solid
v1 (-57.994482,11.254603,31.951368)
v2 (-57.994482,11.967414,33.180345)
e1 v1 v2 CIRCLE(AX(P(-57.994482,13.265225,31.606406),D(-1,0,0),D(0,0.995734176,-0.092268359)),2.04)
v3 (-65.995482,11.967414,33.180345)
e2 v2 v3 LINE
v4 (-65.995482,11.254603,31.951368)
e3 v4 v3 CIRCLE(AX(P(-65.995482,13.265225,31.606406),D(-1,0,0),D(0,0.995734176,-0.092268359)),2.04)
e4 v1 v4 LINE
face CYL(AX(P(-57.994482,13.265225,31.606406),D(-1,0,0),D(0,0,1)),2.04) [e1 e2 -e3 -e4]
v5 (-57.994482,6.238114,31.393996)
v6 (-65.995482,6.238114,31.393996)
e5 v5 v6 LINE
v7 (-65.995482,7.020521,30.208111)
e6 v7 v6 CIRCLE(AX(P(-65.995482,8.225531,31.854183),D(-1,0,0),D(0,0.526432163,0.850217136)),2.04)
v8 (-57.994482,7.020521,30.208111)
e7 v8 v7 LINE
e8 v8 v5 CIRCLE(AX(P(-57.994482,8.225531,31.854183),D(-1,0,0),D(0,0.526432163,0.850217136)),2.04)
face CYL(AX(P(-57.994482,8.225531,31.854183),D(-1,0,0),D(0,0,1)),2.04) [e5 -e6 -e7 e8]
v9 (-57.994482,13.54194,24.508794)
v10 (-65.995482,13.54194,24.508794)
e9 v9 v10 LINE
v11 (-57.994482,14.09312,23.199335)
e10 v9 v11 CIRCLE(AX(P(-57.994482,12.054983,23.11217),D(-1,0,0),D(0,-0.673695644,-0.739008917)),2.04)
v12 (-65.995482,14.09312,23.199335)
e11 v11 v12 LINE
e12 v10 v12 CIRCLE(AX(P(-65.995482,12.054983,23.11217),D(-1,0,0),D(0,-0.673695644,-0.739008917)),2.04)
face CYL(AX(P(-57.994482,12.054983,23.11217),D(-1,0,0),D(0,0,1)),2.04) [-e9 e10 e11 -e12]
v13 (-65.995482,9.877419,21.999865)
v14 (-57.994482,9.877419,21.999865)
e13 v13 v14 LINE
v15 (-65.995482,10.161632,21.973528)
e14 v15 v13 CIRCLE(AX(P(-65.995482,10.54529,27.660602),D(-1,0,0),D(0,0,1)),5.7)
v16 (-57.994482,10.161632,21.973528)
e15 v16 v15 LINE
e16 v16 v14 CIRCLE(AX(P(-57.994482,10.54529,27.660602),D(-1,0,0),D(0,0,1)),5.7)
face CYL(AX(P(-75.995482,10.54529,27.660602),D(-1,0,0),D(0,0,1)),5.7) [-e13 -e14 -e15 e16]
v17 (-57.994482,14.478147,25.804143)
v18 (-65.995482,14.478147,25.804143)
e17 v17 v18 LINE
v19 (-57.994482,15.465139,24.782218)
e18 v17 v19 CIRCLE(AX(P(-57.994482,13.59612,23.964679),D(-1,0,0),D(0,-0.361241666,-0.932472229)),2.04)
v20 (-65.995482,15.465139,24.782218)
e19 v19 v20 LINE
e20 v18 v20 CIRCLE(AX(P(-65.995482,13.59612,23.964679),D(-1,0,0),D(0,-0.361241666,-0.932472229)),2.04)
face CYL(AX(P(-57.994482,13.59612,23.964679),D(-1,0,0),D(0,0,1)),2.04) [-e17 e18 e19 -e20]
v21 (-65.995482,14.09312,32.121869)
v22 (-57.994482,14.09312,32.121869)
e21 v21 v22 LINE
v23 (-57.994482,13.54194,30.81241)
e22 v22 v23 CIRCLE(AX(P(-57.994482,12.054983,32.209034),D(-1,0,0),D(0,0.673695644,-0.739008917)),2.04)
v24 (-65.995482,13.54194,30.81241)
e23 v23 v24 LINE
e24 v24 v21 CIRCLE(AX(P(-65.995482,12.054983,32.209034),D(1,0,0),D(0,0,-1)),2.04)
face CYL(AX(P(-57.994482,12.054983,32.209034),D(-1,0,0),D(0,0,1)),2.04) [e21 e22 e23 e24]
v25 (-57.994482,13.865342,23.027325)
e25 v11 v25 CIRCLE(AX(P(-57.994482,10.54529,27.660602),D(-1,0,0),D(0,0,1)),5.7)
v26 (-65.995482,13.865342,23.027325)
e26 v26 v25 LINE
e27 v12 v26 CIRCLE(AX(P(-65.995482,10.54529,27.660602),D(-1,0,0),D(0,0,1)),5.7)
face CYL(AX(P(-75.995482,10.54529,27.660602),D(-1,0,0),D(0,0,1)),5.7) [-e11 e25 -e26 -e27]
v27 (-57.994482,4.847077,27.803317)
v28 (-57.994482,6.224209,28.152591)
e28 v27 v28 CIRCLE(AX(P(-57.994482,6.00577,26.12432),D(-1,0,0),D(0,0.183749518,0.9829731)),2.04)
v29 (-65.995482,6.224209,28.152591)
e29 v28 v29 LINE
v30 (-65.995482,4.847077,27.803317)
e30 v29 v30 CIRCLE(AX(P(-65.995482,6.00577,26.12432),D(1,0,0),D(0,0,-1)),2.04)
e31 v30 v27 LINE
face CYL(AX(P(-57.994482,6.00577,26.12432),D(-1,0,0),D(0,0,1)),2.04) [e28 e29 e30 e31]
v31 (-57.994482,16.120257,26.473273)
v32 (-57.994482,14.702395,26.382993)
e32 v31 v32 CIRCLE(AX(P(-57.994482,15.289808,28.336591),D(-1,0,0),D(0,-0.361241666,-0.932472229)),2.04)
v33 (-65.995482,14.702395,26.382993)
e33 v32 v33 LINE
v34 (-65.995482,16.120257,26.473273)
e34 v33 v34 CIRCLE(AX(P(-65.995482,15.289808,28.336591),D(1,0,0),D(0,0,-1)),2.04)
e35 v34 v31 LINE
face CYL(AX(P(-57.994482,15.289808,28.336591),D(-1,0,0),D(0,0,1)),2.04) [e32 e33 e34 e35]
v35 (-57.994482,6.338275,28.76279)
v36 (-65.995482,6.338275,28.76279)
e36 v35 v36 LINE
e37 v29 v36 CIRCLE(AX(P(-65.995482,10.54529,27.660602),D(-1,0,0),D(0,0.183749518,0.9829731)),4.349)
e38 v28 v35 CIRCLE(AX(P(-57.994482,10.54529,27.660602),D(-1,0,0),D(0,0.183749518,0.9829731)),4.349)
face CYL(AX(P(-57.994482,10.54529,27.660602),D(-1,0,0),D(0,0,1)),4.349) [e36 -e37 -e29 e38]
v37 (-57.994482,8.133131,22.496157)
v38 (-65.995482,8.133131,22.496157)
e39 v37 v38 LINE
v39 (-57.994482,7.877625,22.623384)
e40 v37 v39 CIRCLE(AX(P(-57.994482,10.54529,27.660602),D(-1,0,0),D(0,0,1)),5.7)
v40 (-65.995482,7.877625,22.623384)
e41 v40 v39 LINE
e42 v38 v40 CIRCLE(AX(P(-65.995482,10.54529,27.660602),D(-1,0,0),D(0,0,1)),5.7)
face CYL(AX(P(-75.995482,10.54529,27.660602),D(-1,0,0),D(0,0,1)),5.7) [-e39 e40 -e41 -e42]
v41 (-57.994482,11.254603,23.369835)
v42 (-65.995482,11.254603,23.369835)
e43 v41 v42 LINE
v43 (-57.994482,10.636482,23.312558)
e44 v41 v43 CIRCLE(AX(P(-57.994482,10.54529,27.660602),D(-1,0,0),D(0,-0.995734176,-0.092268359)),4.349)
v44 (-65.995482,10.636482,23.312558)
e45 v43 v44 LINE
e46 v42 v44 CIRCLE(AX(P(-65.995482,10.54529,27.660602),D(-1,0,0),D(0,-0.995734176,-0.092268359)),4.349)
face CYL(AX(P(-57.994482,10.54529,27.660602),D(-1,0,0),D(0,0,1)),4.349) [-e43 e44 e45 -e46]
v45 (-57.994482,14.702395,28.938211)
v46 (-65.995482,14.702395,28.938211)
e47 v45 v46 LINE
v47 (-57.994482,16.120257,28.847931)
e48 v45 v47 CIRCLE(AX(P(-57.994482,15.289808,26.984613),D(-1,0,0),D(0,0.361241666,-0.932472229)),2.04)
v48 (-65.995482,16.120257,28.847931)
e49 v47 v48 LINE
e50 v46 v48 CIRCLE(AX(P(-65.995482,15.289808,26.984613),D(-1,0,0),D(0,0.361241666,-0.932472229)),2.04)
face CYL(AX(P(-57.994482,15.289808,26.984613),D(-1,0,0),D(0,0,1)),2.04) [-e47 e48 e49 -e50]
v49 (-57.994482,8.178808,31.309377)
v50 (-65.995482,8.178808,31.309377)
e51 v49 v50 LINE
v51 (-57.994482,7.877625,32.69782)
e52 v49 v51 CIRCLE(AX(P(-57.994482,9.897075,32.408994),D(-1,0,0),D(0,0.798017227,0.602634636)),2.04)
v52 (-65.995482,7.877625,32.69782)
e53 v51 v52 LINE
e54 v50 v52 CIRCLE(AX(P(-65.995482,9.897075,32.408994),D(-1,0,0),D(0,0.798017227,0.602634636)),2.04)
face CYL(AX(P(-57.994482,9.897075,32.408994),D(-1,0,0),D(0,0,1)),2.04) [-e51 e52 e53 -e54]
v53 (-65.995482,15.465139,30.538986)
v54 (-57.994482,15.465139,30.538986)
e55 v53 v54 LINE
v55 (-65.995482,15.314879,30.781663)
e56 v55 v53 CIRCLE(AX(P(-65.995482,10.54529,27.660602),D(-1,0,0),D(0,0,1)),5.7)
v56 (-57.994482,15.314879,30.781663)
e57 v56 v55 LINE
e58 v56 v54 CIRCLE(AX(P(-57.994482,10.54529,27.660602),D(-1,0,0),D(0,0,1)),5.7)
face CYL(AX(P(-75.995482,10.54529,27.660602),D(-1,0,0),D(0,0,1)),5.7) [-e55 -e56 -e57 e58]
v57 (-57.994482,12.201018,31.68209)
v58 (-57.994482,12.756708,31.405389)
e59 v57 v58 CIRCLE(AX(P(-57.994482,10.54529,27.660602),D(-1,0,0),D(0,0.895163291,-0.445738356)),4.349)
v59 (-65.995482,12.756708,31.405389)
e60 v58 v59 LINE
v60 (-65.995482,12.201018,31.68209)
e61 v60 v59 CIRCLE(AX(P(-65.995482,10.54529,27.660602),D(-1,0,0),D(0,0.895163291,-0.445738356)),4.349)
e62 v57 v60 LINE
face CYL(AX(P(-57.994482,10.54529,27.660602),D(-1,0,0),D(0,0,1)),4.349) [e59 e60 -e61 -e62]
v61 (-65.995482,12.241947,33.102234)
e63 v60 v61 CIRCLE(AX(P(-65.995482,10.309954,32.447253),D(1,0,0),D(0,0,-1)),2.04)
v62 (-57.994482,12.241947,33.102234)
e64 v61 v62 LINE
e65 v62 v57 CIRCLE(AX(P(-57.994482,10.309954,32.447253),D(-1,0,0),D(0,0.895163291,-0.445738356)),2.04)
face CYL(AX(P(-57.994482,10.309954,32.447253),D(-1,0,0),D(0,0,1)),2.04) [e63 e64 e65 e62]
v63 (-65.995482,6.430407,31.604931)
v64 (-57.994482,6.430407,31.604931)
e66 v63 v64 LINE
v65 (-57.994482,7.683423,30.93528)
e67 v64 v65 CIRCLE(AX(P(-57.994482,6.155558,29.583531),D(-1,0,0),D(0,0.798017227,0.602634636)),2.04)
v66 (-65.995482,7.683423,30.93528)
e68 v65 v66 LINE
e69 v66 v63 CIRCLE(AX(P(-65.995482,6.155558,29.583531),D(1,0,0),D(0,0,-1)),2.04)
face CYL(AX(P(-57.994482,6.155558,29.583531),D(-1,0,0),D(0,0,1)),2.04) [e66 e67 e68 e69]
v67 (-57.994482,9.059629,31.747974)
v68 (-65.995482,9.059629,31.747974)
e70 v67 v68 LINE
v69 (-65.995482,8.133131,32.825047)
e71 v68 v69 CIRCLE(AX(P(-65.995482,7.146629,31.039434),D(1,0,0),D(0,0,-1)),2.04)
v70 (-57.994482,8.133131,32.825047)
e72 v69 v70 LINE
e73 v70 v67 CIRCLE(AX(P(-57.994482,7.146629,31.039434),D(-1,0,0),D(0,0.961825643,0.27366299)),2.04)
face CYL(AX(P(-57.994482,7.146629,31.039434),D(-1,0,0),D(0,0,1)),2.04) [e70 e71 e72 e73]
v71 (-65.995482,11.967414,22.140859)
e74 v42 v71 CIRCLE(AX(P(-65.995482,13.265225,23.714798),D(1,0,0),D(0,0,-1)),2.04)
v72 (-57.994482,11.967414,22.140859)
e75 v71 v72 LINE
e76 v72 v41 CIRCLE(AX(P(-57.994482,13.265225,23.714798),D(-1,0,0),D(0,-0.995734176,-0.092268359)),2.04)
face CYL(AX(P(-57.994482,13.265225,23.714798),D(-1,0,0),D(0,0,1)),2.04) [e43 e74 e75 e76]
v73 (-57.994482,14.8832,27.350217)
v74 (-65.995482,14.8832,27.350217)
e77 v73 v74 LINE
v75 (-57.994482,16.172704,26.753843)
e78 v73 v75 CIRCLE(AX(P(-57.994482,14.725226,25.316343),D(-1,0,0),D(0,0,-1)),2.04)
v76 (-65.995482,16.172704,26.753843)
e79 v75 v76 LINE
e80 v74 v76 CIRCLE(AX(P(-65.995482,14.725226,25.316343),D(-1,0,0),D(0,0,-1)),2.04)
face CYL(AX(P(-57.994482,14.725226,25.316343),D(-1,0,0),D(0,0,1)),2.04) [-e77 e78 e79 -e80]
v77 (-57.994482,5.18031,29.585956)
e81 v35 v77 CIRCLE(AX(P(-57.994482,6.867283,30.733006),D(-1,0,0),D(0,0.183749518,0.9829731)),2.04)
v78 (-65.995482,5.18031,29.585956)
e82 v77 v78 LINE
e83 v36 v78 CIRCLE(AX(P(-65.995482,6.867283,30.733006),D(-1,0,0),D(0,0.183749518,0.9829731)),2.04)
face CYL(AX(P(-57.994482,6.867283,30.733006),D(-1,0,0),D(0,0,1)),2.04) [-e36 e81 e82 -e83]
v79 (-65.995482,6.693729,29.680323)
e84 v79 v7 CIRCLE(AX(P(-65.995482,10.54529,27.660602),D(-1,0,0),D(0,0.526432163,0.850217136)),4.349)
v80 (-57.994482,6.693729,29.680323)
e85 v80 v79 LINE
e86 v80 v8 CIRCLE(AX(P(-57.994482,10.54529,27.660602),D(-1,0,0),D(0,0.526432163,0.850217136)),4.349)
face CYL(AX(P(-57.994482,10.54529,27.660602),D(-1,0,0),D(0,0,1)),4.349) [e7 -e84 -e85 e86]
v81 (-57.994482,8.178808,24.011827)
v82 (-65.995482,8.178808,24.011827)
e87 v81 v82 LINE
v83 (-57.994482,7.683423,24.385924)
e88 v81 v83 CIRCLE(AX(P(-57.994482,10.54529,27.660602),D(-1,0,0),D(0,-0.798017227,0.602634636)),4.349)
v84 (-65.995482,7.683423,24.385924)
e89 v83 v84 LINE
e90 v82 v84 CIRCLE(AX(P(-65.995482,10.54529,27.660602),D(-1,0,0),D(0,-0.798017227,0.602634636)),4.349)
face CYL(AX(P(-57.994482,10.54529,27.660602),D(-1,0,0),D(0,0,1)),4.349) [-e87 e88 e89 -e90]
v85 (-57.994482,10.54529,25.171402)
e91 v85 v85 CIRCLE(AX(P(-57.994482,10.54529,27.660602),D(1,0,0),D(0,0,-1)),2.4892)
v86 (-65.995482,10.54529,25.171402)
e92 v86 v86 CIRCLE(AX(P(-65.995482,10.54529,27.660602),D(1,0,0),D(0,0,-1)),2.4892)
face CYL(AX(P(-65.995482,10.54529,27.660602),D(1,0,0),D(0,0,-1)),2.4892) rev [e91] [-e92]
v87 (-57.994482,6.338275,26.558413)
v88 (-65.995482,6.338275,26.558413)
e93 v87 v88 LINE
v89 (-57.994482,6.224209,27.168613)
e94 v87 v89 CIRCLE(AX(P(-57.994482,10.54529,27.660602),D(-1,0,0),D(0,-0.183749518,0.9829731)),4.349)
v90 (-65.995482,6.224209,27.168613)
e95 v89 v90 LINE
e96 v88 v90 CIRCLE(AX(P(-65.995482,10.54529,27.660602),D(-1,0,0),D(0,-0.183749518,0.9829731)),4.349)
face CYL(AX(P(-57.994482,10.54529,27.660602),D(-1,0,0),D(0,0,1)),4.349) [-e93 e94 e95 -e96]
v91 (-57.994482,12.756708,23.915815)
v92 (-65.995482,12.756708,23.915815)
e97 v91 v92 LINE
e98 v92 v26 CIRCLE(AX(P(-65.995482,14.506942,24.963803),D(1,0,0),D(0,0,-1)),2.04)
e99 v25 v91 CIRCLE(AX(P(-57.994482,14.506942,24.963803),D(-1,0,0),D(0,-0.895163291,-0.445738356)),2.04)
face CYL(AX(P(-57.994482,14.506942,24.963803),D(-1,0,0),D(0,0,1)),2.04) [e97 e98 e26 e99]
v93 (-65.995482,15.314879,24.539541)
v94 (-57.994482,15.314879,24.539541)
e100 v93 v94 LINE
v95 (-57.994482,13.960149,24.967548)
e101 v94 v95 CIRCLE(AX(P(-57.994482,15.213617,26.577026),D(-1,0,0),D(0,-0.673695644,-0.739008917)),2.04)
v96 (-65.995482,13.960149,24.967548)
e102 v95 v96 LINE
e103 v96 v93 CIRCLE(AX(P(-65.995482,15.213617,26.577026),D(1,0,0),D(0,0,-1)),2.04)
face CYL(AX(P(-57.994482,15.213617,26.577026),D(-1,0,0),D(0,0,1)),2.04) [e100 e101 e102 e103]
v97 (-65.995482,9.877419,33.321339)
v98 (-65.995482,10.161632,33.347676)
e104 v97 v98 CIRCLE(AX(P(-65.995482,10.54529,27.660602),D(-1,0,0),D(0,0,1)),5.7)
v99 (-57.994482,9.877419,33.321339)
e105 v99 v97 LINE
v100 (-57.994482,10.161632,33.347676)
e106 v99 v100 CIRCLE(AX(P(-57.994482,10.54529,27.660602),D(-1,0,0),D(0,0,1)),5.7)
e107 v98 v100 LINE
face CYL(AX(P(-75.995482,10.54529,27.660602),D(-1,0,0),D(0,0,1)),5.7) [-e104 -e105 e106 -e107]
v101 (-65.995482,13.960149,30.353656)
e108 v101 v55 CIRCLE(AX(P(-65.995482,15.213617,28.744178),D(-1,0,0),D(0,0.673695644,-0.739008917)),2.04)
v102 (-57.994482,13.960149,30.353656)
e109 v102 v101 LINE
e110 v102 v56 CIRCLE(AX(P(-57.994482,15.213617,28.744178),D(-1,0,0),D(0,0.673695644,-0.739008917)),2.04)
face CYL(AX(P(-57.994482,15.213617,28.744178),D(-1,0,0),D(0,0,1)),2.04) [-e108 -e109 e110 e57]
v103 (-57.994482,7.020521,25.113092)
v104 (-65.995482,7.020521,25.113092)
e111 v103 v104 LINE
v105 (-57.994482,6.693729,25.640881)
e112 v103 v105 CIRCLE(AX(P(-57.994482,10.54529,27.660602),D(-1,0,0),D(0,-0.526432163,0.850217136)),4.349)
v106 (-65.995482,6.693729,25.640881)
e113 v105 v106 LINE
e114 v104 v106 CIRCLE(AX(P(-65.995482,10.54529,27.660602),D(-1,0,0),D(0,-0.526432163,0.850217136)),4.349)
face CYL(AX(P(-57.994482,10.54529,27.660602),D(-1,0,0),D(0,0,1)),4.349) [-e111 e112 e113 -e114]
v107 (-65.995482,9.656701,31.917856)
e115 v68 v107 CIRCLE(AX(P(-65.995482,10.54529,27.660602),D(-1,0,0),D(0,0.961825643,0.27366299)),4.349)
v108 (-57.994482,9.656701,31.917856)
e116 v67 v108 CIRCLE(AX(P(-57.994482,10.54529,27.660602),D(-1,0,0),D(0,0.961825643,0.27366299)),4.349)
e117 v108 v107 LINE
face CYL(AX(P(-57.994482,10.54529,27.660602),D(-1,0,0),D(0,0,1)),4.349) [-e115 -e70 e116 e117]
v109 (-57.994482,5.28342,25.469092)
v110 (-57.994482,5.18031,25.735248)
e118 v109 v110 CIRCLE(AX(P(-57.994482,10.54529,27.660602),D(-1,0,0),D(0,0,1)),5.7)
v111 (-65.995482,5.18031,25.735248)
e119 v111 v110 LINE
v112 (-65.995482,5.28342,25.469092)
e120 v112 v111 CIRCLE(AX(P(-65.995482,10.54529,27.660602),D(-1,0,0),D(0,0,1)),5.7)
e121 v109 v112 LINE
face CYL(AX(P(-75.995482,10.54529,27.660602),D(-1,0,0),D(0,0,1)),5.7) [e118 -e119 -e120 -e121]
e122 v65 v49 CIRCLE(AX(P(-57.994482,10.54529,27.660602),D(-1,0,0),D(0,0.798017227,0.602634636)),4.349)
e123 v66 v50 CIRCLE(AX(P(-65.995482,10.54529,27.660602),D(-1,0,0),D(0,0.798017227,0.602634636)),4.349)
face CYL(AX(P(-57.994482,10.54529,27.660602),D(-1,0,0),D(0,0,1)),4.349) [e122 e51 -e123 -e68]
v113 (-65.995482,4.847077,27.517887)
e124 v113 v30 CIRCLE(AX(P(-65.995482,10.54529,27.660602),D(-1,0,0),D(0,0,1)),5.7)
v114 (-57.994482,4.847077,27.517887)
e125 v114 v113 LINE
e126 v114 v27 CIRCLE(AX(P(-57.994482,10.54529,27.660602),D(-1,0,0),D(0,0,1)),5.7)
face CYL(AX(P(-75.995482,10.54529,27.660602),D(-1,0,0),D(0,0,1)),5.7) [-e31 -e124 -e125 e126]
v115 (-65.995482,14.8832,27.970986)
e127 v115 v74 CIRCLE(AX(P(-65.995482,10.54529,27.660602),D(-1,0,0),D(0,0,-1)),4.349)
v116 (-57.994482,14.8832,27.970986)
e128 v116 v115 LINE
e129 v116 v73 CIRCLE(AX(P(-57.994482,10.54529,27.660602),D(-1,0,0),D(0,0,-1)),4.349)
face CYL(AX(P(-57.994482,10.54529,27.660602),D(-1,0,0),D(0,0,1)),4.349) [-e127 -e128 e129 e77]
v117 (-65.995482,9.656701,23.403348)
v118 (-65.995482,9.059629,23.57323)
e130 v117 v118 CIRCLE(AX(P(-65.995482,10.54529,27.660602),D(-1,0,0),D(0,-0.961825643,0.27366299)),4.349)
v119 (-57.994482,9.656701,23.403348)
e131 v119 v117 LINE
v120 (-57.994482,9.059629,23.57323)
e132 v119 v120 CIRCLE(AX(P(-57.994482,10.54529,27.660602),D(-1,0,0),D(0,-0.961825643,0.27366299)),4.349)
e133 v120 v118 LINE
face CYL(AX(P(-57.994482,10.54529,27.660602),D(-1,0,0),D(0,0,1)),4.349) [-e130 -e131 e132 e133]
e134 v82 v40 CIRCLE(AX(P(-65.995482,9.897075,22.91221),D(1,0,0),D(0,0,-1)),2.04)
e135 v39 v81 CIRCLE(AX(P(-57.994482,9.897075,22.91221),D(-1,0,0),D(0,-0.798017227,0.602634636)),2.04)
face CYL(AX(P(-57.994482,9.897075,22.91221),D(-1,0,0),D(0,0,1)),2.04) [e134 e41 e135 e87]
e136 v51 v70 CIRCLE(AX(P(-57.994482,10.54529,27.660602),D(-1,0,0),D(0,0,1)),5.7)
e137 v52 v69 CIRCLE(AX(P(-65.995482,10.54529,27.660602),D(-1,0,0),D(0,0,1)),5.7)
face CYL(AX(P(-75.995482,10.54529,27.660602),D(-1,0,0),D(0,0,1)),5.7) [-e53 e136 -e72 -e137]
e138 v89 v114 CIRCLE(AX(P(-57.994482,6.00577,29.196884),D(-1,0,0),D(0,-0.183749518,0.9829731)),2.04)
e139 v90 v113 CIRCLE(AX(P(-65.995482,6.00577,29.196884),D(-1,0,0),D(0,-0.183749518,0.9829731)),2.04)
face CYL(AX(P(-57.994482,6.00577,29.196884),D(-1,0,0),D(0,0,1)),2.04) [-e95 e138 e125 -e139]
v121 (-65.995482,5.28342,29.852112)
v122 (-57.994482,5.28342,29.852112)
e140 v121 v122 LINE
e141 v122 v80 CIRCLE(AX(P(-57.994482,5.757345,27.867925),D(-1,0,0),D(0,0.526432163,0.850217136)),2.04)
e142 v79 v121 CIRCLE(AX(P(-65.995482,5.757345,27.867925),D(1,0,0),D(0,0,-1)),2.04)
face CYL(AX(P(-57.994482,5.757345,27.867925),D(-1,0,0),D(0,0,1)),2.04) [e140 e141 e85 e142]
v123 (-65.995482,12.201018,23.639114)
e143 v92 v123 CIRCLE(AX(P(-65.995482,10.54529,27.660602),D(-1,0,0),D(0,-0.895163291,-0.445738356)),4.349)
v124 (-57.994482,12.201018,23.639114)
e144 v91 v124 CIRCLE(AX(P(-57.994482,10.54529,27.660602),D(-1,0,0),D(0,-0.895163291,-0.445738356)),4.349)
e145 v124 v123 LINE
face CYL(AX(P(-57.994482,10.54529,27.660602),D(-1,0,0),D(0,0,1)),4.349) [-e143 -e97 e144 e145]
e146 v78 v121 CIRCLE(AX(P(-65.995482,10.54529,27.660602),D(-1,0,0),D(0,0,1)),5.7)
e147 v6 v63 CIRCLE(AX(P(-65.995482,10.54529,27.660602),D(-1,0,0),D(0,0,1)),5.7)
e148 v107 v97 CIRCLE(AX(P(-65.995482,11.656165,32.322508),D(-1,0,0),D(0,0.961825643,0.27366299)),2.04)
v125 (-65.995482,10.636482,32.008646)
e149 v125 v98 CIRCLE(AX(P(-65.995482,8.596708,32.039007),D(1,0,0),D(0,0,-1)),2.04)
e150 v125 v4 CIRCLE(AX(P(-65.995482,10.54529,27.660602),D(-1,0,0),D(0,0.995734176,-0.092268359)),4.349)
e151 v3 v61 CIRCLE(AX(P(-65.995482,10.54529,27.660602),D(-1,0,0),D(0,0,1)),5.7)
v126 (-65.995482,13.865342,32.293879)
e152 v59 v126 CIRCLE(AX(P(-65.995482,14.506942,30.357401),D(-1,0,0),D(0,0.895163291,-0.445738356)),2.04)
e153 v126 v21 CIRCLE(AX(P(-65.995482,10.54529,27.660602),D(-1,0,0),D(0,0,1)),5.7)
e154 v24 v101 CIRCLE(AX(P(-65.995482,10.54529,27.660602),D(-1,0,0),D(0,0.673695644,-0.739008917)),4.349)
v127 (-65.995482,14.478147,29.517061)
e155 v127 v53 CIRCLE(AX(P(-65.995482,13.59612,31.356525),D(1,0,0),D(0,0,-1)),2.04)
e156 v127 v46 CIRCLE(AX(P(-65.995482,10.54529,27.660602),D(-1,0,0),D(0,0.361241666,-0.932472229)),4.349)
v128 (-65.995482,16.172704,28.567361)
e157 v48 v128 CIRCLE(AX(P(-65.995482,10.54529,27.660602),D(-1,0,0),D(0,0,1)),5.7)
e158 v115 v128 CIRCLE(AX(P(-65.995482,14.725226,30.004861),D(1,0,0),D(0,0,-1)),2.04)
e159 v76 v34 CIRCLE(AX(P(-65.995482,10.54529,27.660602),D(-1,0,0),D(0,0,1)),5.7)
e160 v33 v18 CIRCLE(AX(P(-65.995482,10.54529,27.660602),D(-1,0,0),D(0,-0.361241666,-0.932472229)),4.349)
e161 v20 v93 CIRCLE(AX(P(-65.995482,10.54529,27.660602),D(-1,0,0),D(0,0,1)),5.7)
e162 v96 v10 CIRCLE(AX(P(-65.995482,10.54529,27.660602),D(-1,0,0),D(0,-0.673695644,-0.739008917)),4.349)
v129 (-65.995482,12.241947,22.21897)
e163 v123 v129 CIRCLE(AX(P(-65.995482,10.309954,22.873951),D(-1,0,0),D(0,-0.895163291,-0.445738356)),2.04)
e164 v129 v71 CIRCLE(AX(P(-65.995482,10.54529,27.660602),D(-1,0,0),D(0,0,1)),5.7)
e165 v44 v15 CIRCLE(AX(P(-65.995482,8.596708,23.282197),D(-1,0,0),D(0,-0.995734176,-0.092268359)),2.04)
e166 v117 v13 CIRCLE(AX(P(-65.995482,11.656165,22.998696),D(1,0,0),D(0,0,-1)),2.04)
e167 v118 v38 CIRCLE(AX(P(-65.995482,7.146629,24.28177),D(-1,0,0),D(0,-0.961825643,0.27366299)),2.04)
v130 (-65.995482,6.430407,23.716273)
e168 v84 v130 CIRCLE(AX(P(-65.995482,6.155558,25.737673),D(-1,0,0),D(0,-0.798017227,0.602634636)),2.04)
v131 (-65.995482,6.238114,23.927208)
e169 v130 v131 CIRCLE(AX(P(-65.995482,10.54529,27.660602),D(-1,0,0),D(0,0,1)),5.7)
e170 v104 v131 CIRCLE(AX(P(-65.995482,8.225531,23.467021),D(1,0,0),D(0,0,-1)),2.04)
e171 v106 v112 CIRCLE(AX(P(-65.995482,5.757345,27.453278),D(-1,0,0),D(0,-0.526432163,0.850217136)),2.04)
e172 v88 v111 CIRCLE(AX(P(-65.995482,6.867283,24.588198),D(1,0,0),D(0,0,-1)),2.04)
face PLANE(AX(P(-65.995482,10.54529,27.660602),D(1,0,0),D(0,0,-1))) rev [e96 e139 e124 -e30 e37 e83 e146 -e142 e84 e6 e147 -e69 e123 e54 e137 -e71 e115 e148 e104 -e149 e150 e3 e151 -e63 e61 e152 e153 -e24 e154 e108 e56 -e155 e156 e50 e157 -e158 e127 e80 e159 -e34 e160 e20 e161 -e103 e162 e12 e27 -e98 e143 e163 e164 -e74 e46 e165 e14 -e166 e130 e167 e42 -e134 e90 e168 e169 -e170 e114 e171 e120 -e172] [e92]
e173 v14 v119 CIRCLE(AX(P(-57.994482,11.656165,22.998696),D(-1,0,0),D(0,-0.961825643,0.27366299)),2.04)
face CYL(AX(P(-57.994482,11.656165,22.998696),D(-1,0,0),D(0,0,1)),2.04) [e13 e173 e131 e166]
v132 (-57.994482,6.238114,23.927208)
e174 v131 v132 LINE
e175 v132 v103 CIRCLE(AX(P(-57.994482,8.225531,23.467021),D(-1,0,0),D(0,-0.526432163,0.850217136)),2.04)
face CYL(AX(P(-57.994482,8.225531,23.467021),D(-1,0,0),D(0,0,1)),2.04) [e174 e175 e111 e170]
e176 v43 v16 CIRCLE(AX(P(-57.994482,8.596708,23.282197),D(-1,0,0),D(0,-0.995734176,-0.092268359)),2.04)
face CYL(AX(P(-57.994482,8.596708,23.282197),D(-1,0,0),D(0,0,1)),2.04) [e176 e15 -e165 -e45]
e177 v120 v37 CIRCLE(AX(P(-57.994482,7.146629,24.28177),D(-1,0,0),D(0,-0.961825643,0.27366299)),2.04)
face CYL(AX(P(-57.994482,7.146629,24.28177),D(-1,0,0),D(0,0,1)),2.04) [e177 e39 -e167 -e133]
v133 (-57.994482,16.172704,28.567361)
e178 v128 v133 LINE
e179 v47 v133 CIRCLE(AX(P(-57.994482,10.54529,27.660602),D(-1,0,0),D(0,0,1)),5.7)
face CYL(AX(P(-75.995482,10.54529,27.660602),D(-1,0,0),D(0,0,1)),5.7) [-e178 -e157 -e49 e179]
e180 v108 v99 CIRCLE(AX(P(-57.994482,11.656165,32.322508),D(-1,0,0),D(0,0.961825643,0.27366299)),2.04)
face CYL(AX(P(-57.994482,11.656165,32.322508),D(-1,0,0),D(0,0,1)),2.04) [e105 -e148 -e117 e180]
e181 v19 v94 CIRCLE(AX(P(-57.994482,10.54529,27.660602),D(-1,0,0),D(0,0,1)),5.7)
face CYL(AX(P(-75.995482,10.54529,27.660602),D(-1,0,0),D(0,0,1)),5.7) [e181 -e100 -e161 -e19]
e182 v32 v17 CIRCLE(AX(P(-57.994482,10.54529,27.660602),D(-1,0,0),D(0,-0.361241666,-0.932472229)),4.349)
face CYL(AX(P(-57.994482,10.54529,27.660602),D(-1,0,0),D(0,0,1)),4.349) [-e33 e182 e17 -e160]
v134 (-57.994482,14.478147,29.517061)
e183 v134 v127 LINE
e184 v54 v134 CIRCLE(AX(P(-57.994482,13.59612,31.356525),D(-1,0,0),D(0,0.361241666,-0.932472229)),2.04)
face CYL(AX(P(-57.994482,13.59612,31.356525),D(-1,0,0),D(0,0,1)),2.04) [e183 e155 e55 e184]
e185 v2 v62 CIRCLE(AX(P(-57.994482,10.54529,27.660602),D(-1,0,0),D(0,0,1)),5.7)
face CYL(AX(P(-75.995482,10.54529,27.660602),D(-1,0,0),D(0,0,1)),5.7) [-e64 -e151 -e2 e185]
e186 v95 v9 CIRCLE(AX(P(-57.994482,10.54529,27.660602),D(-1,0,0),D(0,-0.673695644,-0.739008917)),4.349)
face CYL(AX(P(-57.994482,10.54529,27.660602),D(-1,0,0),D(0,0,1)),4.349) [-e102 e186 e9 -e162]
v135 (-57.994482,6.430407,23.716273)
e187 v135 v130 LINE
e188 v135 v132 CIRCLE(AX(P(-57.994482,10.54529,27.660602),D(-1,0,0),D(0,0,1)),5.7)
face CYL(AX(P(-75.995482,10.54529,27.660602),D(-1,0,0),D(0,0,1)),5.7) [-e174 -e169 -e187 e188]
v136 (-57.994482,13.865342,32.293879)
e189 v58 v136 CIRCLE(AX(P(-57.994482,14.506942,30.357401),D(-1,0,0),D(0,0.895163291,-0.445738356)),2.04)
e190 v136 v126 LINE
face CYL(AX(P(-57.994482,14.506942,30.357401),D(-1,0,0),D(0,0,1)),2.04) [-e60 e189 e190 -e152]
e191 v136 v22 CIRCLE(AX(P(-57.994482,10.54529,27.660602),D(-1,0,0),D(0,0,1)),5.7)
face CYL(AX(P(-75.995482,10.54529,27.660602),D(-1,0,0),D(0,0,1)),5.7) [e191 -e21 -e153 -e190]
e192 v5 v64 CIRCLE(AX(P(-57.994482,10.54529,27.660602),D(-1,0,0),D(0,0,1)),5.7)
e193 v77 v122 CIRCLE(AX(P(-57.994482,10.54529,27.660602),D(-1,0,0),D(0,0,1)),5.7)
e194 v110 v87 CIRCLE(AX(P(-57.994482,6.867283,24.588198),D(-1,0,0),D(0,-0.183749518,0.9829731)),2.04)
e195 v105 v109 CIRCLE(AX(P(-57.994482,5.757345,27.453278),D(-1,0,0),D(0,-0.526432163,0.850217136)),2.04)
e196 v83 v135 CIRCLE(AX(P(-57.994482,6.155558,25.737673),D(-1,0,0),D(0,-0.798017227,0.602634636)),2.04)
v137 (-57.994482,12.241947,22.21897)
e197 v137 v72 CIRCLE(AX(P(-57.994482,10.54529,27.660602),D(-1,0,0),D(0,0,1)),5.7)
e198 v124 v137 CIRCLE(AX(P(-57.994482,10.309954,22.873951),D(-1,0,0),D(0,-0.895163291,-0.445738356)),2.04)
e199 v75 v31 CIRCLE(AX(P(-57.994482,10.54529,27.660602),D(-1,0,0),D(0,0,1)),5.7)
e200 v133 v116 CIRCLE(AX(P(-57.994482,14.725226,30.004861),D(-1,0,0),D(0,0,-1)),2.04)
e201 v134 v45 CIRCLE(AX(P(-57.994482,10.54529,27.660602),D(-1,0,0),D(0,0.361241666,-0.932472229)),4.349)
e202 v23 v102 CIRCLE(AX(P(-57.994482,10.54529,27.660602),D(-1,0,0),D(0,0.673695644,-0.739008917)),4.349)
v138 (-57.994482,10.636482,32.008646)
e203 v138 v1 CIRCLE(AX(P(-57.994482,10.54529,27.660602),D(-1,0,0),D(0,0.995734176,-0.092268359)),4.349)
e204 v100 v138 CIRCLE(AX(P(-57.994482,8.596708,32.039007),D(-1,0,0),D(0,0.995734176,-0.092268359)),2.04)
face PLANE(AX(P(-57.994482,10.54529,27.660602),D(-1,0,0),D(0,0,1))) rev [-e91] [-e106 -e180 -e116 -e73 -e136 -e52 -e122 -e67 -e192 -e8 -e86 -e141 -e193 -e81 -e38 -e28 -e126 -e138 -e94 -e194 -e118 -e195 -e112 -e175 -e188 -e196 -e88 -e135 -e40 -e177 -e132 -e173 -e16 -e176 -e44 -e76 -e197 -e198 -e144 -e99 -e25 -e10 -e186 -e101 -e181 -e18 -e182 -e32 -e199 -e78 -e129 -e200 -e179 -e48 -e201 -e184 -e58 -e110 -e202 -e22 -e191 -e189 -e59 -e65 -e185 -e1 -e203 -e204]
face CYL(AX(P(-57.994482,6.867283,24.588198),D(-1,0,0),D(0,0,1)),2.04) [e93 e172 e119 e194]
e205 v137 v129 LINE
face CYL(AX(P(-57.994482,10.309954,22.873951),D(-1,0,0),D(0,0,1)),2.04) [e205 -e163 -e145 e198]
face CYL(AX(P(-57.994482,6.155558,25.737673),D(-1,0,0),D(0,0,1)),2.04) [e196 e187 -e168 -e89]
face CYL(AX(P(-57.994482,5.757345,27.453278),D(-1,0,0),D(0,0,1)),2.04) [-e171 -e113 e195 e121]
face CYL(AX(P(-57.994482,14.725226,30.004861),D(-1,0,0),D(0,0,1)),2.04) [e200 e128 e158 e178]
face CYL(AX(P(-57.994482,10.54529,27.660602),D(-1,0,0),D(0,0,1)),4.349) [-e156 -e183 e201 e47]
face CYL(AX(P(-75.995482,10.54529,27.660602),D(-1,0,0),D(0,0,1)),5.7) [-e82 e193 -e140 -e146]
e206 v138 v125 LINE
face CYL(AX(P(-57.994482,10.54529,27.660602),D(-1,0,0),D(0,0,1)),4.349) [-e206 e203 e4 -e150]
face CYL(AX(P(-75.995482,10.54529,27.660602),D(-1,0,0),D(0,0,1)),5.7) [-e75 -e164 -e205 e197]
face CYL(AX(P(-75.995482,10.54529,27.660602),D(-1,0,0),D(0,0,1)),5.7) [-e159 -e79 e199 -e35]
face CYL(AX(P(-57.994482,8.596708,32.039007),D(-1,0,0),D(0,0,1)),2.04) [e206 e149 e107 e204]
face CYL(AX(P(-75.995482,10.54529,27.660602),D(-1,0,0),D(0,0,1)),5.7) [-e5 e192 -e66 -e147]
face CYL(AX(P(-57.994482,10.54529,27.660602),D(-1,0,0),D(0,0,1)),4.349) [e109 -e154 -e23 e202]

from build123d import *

# Parameters (mm, degrees)
SPUR_START             = -65.99548243
SPUR_GEAR_AM_OUTLINE_R = 2
SPUR_GEAR_AM_DEPTH     = 8.001
SKETCH1_R              = 2.4892
CUT_EXTRUDE1_DEPTH     = 38.916221237


# Read off the part's stored shape, not the designer's step: spur gear_am
with BuildPart() as part:
    # spur gear_am outline → spur gear_am (new body)
    with BuildSketch(Plane.YZ.offset(SPUR_START)):
        with BuildLine():
            ThreePointArc((15.314879055, 24.539540588), (15.391528072, 24.659938624), (15.465138567, 24.782218033))
            ThreePointArc((15.465138567, 24.782218033), (15.063480167, 25.38187856), (14.478147109, 25.804143203))
            ThreePointArc((14.478147109, 25.804143203), (14.600612124, 26.089561946), (14.70239475, 26.38299309))
            ThreePointArc((14.70239475, 26.38299309), (15.41943895, 26.300714095), (16.120256774, 26.473273058))
            ThreePointArc((16.120256774, 26.473273058), (16.148237066, 26.613229702), (16.172704392, 26.753843033))
            ThreePointArc((16.172704392, 26.753843033), (15.58154672, 27.167914071), (14.883200315, 27.350217435))
            ThreePointArc((14.883200315, 27.350217435), (14.894290398, 27.660601953), (14.883200315, 27.970986471))
            ThreePointArc((14.883200315, 27.970986471), (15.58154672, 28.153289835), (16.172704392, 28.567360874))
            ThreePointArc((16.172704392, 28.567360874), (16.148237066, 28.707974205), (16.120256774, 28.847930848))
            ThreePointArc((16.120256774, 28.847930848), (15.41943895, 29.020489811), (14.70239475, 28.938210816))
            ThreePointArc((14.70239475, 28.938210816), (14.600612124, 29.23164196), (14.478147109, 29.517060703))
            ThreePointArc((14.478147109, 29.517060703), (15.063480167, 29.939325346), (15.465138567, 30.538985873))
            ThreePointArc((15.465138567, 30.538985873), (15.391528072, 30.661265282), (15.314879055, 30.781663318))
            ThreePointArc((15.314879055, 30.781663318), (14.599050409, 30.68940516), (13.960149206, 30.35365604))
            ThreePointArc((13.960149206, 30.35365604), (13.759240179, 30.590504307), (13.541939811, 30.812409893))
            ThreePointArc((13.541939811, 30.812409893), (13.93520705, 31.417606636), (14.093119986, 32.121869174))
            ThreePointArc((14.093119986, 32.121869174), (13.980307826, 32.209300149), (13.865341959, 32.293879155))
            ThreePointArc((13.865341959, 32.293879155), (13.231179117, 31.949263852), (12.756708059, 31.405389388))
            ThreePointArc((12.756708059, 31.405389388), (12.483806507, 31.553667107), (12.201018405, 31.682089957))
            ThreePointArc((12.201018405, 31.682089957), (12.349106905, 32.388483625), (12.241947359, 33.102233616))
            ThreePointArc((12.241947359, 33.102233616), (12.105169441, 33.143008119), (11.967413502, 33.180345233))
            ThreePointArc((11.967413502, 33.180345233), (11.500563669, 32.629914991), (11.254602702, 31.951368441))
            ThreePointArc((11.254602702, 31.951368441), (10.946565493, 31.991049886), (10.636481757, 32.008645782))
            ThreePointArc((10.636481757, 32.008645782), (10.519391345, 32.720833997), (10.161631808, 33.347675549))
            ThreePointArc((10.161631808, 33.347675549), (10.019360749, 33.336286758), (9.87741944, 33.321339395))
            ThreePointArc((9.87741944, 33.321339395), (9.640933273, 32.639432869), (9.656700788, 31.917855705))
            ThreePointArc((9.656700788, 31.917855705), (9.355130054, 31.843581675), (9.059629211, 31.747974194))
            ThreePointArc((9.059629211, 31.747974194), (8.693173595, 32.369771991), (8.133131476, 32.82504668))
            ThreePointArc((8.133131476, 32.82504668), (8.00458177, 32.763032714), (7.877625051, 32.697819598))
            ThreePointArc((7.877625051, 32.697819598), (7.903441318, 31.976532042), (8.178807825, 31.309377259))
            ThreePointArc((8.178807825, 31.309377259), (7.924432364, 31.131178875), (7.68342344, 30.935280336))
            ThreePointArc((7.68342344, 30.935280336), (7.117094483, 31.382710477), (6.430406572, 31.604930933))
            ThreePointArc((6.430406572, 31.604930933), (6.33293957, 31.500667122), (6.23811365, 31.393995646))
            ThreePointArc((6.23811365, 31.393995646), (6.52274572, 30.730740941), (7.020521446, 30.208111489))
            ThreePointArc((7.020521446, 30.208111489), (6.847696075, 29.950055429), (6.69372866, 29.680323017))
            ThreePointArc((6.69372866, 29.680323017), (6.004012226, 29.892957582), (5.283419531, 29.852111701))
            ThreePointArc((5.283419531, 29.852111701), (5.23019869, 29.71967945), (5.180310335, 29.585956188))
            ThreePointArc((5.180310335, 29.585956188), (5.685317071, 29.070310558), (6.338274646, 28.76279044))
            ThreePointArc((6.338274646, 28.76279044), (6.270340387, 28.459728606), (6.224208635, 28.152591177))
            ThreePointArc((6.224208635, 28.152591177), (5.504254749, 28.10171269), (4.847077307, 27.803316934))
            ThreePointArc((4.847077307, 27.803316934), (4.845290398, 27.660601953), (4.847077307, 27.517886972))
            ThreePointArc((4.847077307, 27.517886972), (5.504254749, 27.219491216), (6.224208635, 27.168612729))
            ThreePointArc((6.224208635, 27.168612729), (6.270340387, 26.8614753), (6.338274646, 26.558413466))
            ThreePointArc((6.338274646, 26.558413466), (5.685317071, 26.250893348), (5.180310335, 25.735247718))
            ThreePointArc((5.180310335, 25.735247718), (5.23019869, 25.601524456), (5.283419531, 25.469092205))
            ThreePointArc((5.283419531, 25.469092205), (6.004012226, 25.428246324), (6.69372866, 25.640880889))
            ThreePointArc((6.69372866, 25.640880889), (6.847696075, 25.371148477), (7.020521446, 25.113092417))
            ThreePointArc((7.020521446, 25.113092417), (6.52274572, 24.590462965), (6.23811365, 23.927208261))
            ThreePointArc((6.23811365, 23.927208261), (6.33293957, 23.820536784), (6.430406572, 23.716272973))
            ThreePointArc((6.430406572, 23.716272973), (7.117094483, 23.938493429), (7.68342344, 24.38592357))
            ThreePointArc((7.68342344, 24.38592357), (7.924432364, 24.190025032), (8.178807825, 24.011826648))
            ThreePointArc((8.178807825, 24.011826648), (7.903441318, 23.344671864), (7.877625051, 22.623384308))
            ThreePointArc((7.877625051, 22.623384308), (8.00458177, 22.558171192), (8.133131476, 22.496157226))
            ThreePointArc((8.133131476, 22.496157226), (8.693173595, 22.951431915), (9.059629211, 23.573229712))
            ThreePointArc((9.059629211, 23.573229712), (9.355130054, 23.477622231), (9.656700788, 23.403348202))
            ThreePointArc((9.656700788, 23.403348202), (9.640933273, 22.681771038), (9.87741944, 21.999864511))
            ThreePointArc((9.87741944, 21.999864511), (10.019360749, 21.984917148), (10.161631808, 21.973528357))
            ThreePointArc((10.161631808, 21.973528357), (10.519391345, 22.600369909), (10.636481757, 23.312558124))
            ThreePointArc((10.636481757, 23.312558124), (10.946565493, 23.33015402), (11.254602702, 23.369835465))
            ThreePointArc((11.254602702, 23.369835465), (11.500563669, 22.691288915), (11.967413502, 22.140858673))
            ThreePointArc((11.967413502, 22.140858673), (12.105169441, 22.178195787), (12.241947359, 22.21897029))
            ThreePointArc((12.241947359, 22.21897029), (12.349106905, 22.932720281), (12.201018405, 23.639113949))
            ThreePointArc((12.201018405, 23.639113949), (12.483806507, 23.767536799), (12.756708059, 23.915814519))
            ThreePointArc((12.756708059, 23.915814519), (13.231179116, 23.371940054), (13.865341959, 23.027324751))
            ThreePointArc((13.865341959, 23.027324751), (13.980307825, 23.111903758), (14.093119986, 23.199334732))
            ThreePointArc((14.093119986, 23.199334732), (13.93520705, 23.90359727), (13.541939811, 24.508794013))
            ThreePointArc((13.541939811, 24.508794013), (13.759240179, 24.730699599), (13.960149206, 24.967547866))
            ThreePointArc((13.960149206, 24.967547866), (14.599050409, 24.631798746), (15.314879055, 24.539540588))
        make_face()
        with Locations((10.545290398, 27.660601953)):
            Circle(SPUR_GEAR_AM_OUTLINE_R, mode=Mode.SUBTRACT)
    extrude(amount=SPUR_GEAR_AM_DEPTH)

    # Sketch1 → Cut-Extrude1 (cut, through all)
    with BuildSketch(Plane(origin=(-57.99448243, 0, 0), x_dir=(0, 0, -1), z_dir=(1, 0, 0))):
        with Locations((-27.660601953, 10.545290398)):
            Circle(SKETCH1_R)
    extrude(amount=-CUT_EXTRUDE1_DEPTH, mode=Mode.SUBTRACT)


solid = part.part
